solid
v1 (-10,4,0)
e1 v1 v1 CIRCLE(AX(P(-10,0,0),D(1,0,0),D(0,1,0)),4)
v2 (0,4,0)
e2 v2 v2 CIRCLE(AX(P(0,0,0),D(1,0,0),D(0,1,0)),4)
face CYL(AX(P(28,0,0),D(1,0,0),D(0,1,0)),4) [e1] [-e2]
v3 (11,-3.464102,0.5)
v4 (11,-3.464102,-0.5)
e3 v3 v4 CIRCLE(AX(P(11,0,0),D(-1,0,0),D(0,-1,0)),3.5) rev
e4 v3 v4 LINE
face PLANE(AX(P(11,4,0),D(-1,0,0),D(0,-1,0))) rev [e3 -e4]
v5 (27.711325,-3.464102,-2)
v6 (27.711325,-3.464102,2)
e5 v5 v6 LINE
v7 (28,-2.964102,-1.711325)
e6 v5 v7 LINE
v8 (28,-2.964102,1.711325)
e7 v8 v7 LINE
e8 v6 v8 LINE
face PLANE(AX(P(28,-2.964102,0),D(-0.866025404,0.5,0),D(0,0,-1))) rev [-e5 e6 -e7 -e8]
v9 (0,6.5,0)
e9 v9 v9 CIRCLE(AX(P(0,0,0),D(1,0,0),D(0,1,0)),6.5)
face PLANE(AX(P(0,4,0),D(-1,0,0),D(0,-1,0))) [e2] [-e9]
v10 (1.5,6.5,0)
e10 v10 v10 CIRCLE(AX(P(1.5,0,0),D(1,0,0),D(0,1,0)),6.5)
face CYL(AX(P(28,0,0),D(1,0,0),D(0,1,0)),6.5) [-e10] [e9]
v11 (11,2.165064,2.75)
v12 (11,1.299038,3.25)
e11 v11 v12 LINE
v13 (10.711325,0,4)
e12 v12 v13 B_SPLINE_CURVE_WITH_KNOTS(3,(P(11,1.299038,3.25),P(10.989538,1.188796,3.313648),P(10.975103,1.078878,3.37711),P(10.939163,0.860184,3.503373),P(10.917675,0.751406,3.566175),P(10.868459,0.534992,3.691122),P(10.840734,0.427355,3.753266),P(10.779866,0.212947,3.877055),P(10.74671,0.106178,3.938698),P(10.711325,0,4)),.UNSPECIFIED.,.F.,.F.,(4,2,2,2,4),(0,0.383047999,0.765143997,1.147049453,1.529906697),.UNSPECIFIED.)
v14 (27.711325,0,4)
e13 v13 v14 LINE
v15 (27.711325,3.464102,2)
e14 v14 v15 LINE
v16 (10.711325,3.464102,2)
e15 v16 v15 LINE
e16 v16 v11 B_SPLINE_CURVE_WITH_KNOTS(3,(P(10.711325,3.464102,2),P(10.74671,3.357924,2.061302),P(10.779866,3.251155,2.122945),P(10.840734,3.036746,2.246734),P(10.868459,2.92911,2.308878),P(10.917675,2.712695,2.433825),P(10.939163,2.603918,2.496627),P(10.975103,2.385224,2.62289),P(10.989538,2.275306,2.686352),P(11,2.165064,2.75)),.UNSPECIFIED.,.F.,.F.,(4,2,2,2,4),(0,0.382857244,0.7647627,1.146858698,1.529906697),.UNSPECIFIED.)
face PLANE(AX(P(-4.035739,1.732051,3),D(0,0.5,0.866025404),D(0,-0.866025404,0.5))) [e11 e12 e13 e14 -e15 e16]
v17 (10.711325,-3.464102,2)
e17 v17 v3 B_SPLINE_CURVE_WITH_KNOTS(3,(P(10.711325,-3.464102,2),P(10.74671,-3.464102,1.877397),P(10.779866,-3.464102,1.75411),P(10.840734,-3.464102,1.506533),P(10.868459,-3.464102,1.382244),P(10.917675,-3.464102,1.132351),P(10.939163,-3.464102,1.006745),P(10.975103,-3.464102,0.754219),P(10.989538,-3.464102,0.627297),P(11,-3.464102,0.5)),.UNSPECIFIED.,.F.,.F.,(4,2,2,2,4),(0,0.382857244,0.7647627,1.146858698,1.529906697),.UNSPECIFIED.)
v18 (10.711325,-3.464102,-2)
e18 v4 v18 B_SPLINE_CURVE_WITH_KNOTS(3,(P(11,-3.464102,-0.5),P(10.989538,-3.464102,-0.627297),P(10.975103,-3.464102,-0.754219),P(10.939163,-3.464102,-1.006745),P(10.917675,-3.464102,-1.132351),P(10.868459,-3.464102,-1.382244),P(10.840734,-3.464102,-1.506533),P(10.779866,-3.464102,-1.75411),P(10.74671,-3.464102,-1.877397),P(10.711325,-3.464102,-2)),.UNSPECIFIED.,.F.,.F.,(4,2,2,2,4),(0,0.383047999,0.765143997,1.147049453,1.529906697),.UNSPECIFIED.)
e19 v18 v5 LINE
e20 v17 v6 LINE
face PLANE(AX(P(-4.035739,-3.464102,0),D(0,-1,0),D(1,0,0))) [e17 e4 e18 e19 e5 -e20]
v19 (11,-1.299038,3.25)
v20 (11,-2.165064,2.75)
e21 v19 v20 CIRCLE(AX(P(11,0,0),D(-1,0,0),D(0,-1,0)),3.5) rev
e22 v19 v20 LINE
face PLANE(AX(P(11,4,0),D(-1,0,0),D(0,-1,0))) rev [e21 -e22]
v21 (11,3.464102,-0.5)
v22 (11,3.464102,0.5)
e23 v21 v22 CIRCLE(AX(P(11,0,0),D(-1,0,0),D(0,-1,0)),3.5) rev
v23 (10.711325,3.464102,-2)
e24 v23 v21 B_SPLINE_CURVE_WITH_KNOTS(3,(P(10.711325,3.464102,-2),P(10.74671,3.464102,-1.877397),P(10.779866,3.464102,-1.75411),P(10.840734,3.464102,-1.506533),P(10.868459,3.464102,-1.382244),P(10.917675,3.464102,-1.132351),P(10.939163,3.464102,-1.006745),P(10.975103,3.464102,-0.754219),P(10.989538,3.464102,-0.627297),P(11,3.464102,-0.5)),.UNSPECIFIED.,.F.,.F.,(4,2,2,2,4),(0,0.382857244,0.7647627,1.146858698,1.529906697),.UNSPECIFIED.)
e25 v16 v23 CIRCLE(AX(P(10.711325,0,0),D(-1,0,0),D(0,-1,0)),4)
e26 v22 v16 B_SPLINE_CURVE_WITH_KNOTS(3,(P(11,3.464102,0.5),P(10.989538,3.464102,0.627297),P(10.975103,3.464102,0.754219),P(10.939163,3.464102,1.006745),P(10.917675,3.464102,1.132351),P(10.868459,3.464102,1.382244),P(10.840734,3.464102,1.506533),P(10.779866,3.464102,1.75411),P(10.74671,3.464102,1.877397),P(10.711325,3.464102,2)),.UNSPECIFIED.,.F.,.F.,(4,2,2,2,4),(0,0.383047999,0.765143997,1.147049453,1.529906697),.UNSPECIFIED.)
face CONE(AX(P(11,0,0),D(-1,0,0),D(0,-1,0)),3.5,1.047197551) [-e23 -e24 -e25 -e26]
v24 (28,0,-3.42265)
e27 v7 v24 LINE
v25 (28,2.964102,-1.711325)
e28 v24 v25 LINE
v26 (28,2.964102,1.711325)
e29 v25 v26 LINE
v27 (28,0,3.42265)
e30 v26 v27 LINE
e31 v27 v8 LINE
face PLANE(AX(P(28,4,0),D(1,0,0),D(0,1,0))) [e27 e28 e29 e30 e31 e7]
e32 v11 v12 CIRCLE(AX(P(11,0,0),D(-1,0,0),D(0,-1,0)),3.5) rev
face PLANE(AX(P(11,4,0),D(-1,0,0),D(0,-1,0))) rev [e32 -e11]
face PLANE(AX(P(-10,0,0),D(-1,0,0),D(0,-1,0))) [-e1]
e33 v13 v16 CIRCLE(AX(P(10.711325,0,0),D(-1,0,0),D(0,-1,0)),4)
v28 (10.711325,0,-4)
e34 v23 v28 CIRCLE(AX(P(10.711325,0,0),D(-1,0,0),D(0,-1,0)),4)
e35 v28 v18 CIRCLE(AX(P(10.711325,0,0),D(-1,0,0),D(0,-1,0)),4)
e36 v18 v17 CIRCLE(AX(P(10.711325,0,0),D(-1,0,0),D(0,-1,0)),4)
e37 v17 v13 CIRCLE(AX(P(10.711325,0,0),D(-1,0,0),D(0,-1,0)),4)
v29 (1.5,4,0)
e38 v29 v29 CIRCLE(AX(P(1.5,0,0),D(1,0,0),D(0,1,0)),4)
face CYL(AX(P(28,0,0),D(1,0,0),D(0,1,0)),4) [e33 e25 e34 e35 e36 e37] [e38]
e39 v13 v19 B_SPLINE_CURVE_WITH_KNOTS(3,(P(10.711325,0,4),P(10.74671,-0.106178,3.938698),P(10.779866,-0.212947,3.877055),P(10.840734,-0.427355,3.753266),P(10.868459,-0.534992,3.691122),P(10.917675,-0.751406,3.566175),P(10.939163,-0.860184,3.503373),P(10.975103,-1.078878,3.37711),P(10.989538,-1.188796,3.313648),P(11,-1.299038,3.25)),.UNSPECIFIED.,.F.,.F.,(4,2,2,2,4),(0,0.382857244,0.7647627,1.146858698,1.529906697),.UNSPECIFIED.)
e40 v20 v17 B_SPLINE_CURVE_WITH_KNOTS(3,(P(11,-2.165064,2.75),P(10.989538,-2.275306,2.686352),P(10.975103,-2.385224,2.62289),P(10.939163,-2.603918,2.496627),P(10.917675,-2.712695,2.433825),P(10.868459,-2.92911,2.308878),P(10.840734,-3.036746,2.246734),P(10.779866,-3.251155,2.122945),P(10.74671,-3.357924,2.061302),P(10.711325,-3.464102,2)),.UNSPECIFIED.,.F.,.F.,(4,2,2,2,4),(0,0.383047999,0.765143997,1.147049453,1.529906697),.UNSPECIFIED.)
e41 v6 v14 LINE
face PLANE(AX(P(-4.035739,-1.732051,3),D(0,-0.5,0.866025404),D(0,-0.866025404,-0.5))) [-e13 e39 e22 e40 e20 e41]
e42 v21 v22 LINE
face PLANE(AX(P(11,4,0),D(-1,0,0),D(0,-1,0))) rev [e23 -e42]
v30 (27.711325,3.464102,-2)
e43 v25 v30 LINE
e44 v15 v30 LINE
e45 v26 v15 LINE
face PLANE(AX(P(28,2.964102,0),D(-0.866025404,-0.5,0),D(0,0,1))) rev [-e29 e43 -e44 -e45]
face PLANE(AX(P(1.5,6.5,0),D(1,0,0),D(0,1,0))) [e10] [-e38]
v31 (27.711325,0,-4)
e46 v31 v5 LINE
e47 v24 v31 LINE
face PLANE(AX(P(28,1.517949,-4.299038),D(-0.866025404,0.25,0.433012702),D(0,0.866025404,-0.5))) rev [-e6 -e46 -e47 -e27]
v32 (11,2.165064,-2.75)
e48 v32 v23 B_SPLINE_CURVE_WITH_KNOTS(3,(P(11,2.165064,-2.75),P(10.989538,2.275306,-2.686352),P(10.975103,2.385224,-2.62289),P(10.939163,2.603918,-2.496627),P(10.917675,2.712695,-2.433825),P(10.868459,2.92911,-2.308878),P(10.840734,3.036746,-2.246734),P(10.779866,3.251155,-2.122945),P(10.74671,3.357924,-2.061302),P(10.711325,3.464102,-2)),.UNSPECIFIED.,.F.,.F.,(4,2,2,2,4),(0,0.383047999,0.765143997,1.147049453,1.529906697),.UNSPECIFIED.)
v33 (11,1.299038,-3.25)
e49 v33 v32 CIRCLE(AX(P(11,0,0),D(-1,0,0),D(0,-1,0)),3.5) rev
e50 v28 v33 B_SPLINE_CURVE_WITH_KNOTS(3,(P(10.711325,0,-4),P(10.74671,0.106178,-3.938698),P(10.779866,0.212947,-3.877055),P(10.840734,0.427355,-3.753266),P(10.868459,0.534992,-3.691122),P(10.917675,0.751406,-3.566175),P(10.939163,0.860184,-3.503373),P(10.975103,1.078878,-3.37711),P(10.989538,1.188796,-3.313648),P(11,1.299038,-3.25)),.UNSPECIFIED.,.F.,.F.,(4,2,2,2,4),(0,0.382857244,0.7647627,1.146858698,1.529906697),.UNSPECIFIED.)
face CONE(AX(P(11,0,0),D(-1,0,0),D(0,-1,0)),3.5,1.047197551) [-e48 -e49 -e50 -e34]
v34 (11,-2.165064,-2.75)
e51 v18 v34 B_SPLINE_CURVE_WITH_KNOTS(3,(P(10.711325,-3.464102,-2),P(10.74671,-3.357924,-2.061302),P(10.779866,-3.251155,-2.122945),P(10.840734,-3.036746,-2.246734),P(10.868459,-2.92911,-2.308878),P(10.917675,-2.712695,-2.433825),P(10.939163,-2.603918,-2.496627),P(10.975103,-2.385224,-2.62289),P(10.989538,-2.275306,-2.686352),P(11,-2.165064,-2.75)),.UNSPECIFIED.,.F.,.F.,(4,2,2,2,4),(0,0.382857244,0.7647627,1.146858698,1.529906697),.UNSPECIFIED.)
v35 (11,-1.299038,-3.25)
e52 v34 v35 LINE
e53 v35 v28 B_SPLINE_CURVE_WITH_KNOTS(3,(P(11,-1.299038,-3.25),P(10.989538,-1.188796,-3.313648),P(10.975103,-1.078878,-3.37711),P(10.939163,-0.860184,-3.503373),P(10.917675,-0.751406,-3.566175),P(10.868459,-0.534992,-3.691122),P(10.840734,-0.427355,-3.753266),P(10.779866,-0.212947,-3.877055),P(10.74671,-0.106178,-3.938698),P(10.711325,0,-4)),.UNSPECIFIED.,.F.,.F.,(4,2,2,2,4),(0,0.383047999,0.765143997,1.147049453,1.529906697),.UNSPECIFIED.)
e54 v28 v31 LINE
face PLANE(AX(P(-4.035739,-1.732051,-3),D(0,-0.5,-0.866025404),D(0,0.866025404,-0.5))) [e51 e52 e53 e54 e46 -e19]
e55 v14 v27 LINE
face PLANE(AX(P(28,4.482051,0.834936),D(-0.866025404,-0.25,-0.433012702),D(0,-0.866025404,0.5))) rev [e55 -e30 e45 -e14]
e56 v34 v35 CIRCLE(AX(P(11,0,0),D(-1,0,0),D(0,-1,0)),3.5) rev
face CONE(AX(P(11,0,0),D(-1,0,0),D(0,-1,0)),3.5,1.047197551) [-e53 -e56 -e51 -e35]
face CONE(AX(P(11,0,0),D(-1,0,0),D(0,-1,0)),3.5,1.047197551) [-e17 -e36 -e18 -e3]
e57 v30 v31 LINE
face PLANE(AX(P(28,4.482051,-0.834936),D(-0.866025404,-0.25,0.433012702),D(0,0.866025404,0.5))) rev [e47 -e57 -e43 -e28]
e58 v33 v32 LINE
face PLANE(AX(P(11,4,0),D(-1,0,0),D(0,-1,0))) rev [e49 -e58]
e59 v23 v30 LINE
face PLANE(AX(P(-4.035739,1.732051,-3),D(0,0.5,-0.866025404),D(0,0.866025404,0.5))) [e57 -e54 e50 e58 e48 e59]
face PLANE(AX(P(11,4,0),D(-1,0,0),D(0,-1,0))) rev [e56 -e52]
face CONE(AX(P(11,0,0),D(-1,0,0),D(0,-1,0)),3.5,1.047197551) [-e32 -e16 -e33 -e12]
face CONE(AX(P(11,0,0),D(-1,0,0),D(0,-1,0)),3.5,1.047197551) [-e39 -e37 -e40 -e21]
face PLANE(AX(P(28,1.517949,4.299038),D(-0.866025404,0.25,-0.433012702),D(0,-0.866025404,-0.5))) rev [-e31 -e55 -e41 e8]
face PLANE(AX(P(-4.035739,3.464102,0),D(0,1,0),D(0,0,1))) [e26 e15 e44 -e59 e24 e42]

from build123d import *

# Parameters (mm, degrees)
CUT_EXTRUDE1_DEPTH = 17
CHAMFER1_SIZE      = 0.288675135
CHAMFER1_SIZE_2    = 0.5
CHAMFER2_SIZE      = 0.5
CHAMFER2_SIZE2     = 0.288675135


with BuildPart() as part:
    # Sketch2 → Revolve1 (revolve)
    with BuildSketch(Plane.XY):
        Polygon((0, 0), (-10, 0), (-10, 4), (0, 4), (0, 6.5), (1.5, 6.5), (1.5, 4), (28, 4), (28, 0), align=None)
    revolve(axis=Axis((28, 0, 0), (-1, 0, 0)))

    # Sketch3 → Cut-Extrude1 (cut)
    with BuildSketch(Plane(origin=(28, 0, 0), x_dir=(0, 0, -1), z_dir=(1, 0, 0))):
        with BuildLine():
            Line((-2, 3.464101615), (2, 3.464101615))
            ThreePointArc((2, 3.464101615), (0, 4), (-2, 3.464101615))
        make_face()
        with BuildLine():
            Line((2, 3.464101615), (4, 0))
            ThreePointArc((4, 0), (3.464101615, 2), (2, 3.464101615))
        make_face()
        with BuildLine():
            Line((-4, 0), (-2, 3.464101615))
            ThreePointArc((-2, 3.464101615), (-3.464101615, 2), (-4, 0))
        make_face()
        with BuildLine():
            ThreePointArc((-4, 0), (-3.464101615, -2), (-2, -3.464101615))
            Line((-2, -3.464101615), (-4, 0))
        make_face()
        with BuildLine():
            ThreePointArc((-2, -3.464101615), (0, -4), (2, -3.464101615))
            Line((2, -3.464101615), (-2, -3.464101615))
        make_face()
        with BuildLine():
            ThreePointArc((2, -3.464101615), (3.464101615, -2), (4, 0))
            Line((4, 0), (2, -3.464101615))
        make_face()
    extrude(amount=-CUT_EXTRUDE1_DEPTH, mode=Mode.SUBTRACT)

    # Chamfer1
    # the kernel refuses this chamfer: 0.5, 0.288675135 mm, written as the material it takes off along each edge
    with BuildSketch(Plane(origin=(11, 0, 0), x_dir=(0, -0.8660254037844389, -0.49999999999999956), z_dir=(0, -0.49999999999999956, 0.8660254037844389))) as chamfer1_piece_1_section:
        Polygon((4, -CHAMFER1_SIZE * 0.999999998596), (4 - CHAMFER1_SIZE_2, 0), (4, 0), align=None)
    chamfer1_piece_1 = revolve(axis=Axis((11, 0, 0), (1, 0, 0)), revolution_arc=60, mode=Mode.PRIVATE)
    chamfer1_piece_1 = split(chamfer1_piece_1, bisect_by=Plane(origin=(10.787249311, -3.461547111, -2.001474844), z_dir=(0, -0.4999999999999996, -0.8660254037844389)), keep=Keep.TOP, mode=Mode.PRIVATE)
    add(chamfer1_piece_1, mode=Mode.SUBTRACT)
    with BuildSketch(Plane(origin=(11, 0, 0), x_dir=(0, 0, 1), z_dir=(0, 1, 0))) as chamfer1_piece_2_section:
        Polygon((4, -CHAMFER1_SIZE * 0.999999998596), (4 - CHAMFER1_SIZE_2, 0), (4, 0), align=None)
    chamfer1_piece_2 = revolve(axis=Axis((11, 0, 0), (1, 0, 0)), revolution_arc=60, mode=Mode.PRIVATE)
    chamfer1_piece_2 = split(chamfer1_piece_2, bisect_by=Plane(origin=(10.787249311, -0.002554504, 3.998525156), z_dir=(0, -0.4999999999999999, 0.8660254037844387)), keep=Keep.TOP, mode=Mode.PRIVATE)
    add(chamfer1_piece_2, mode=Mode.SUBTRACT)
    with BuildSketch(Plane(origin=(11, 0, 0), x_dir=(0, 1, 0), z_dir=(0, 0, -1))) as chamfer1_piece_3_section:
        Polygon((4, -CHAMFER1_SIZE * 0.999999998596), (4 - CHAMFER1_SIZE_2, 0), (4, 0), align=None)
    chamfer1_piece_3 = revolve(axis=Axis((11, 0, 0), (1, 0, 0)), revolution_arc=30, mode=Mode.PRIVATE)
    chamfer1_piece_3 = split(chamfer1_piece_3, bisect_by=Plane(origin=(10.898935311, 3.464101615, 0.855614375), z_dir=(0, 1, 0)), keep=Keep.TOP, mode=Mode.PRIVATE)
    add(chamfer1_piece_3, mode=Mode.SUBTRACT)
    with BuildSketch(Plane(origin=(11, 0, 0), x_dir=(0, 0, -1), z_dir=(0, -1, 0))) as chamfer1_piece_4_section:
        Polygon((4, -CHAMFER1_SIZE * 0.999999998596), (4 - CHAMFER1_SIZE_2, 0), (4, 0), align=None)
    chamfer1_piece_4 = revolve(axis=Axis((11, 0, 0), (1, 0, 0)), revolution_arc=60, mode=Mode.PRIVATE)
    chamfer1_piece_4 = split(chamfer1_piece_4, bisect_by=Plane(origin=(10.787249311, 0.002554504, -3.998525156), z_dir=(0, 0.49999999999999983, -0.8660254037844388)), keep=Keep.TOP, mode=Mode.PRIVATE)
    add(chamfer1_piece_4, mode=Mode.SUBTRACT)
    with BuildSketch(Plane(origin=(11, 0, 0), x_dir=(0, 0.8660254037844386, 0.5000000000000003), z_dir=(0, 0.5000000000000003, -0.8660254037844386))) as chamfer1_piece_5_section:
        Polygon((4, -CHAMFER1_SIZE * 0.999999998596), (4 - CHAMFER1_SIZE_2, 0), (4, 0), align=None)
    chamfer1_piece_5 = revolve(axis=Axis((11, 0, 0), (1, 0, 0)), revolution_arc=60, mode=Mode.PRIVATE)
    chamfer1_piece_5 = split(chamfer1_piece_5, bisect_by=Plane(origin=(10.787249311, 3.461547111, 2.001474844), z_dir=(0, 0.5000000000000001, 0.8660254037844386)), keep=Keep.TOP, mode=Mode.PRIVATE)
    add(chamfer1_piece_5, mode=Mode.SUBTRACT)
    with BuildSketch(Plane(origin=(11, 0, 0), x_dir=(0, -0.8660254037844388, 0.4999999999999997), z_dir=(0, 0.4999999999999997, 0.8660254037844388))) as chamfer1_piece_6_section:
        Polygon((4, -CHAMFER1_SIZE * 0.999999998596), (4 - CHAMFER1_SIZE_2, 0), (4, 0), align=None)
    chamfer1_piece_6 = revolve(axis=Axis((11, 0, 0), (1, 0, 0)), revolution_arc=60, mode=Mode.PRIVATE)
    chamfer1_piece_6 = split(chamfer1_piece_6, bisect_by=Plane(origin=(10.787249311, -3.464101615, 1.997050313), z_dir=(0, -1, 0)), keep=Keep.TOP, mode=Mode.PRIVATE)
    add(chamfer1_piece_6, mode=Mode.SUBTRACT)
    with BuildSketch(Plane(origin=(11, 0, 0), x_dir=(0, 0.8660254037844385, -0.5000000000000003), z_dir=(0, -0.5000000000000003, -0.8660254037844385))) as chamfer1_piece_7_section:
        Polygon((4, -CHAMFER1_SIZE * 0.999999998596), (4 - CHAMFER1_SIZE_2, 0), (4, 0), align=None)
    chamfer1_piece_7 = revolve(axis=Axis((11, 0, 0), (1, 0, 0)), revolution_arc=30, mode=Mode.PRIVATE)
    chamfer1_piece_7 = split(chamfer1_piece_7, bisect_by=Plane(origin=(10.787249311, 3.464101615, -1.997050313), z_dir=(0, 1, 0)), keep=Keep.TOP, mode=Mode.PRIVATE)
    add(chamfer1_piece_7, mode=Mode.SUBTRACT)

    # Chamfer2
    chamfer2_edges = [part.edges().sort_by_distance(p)[0] for p in [
        (28, -1.732050808, -3),
        (28, -1.732050808, 3),
        (28, 3.464101615, 0),
        (28, 1.732050808, -3),
        (28, 1.732050808, 3),
        (28, -3.464101615, 0),
    ]]
    chamfer2_side = [part.faces().sort_by_distance(p)[0] for p in [
        (28, 0, 0),
    ]]
    chamfer(chamfer2_edges, length=CHAMFER2_SIZE, length2=CHAMFER2_SIZE2, reference=chamfer2_side[0])


solid = part.part
